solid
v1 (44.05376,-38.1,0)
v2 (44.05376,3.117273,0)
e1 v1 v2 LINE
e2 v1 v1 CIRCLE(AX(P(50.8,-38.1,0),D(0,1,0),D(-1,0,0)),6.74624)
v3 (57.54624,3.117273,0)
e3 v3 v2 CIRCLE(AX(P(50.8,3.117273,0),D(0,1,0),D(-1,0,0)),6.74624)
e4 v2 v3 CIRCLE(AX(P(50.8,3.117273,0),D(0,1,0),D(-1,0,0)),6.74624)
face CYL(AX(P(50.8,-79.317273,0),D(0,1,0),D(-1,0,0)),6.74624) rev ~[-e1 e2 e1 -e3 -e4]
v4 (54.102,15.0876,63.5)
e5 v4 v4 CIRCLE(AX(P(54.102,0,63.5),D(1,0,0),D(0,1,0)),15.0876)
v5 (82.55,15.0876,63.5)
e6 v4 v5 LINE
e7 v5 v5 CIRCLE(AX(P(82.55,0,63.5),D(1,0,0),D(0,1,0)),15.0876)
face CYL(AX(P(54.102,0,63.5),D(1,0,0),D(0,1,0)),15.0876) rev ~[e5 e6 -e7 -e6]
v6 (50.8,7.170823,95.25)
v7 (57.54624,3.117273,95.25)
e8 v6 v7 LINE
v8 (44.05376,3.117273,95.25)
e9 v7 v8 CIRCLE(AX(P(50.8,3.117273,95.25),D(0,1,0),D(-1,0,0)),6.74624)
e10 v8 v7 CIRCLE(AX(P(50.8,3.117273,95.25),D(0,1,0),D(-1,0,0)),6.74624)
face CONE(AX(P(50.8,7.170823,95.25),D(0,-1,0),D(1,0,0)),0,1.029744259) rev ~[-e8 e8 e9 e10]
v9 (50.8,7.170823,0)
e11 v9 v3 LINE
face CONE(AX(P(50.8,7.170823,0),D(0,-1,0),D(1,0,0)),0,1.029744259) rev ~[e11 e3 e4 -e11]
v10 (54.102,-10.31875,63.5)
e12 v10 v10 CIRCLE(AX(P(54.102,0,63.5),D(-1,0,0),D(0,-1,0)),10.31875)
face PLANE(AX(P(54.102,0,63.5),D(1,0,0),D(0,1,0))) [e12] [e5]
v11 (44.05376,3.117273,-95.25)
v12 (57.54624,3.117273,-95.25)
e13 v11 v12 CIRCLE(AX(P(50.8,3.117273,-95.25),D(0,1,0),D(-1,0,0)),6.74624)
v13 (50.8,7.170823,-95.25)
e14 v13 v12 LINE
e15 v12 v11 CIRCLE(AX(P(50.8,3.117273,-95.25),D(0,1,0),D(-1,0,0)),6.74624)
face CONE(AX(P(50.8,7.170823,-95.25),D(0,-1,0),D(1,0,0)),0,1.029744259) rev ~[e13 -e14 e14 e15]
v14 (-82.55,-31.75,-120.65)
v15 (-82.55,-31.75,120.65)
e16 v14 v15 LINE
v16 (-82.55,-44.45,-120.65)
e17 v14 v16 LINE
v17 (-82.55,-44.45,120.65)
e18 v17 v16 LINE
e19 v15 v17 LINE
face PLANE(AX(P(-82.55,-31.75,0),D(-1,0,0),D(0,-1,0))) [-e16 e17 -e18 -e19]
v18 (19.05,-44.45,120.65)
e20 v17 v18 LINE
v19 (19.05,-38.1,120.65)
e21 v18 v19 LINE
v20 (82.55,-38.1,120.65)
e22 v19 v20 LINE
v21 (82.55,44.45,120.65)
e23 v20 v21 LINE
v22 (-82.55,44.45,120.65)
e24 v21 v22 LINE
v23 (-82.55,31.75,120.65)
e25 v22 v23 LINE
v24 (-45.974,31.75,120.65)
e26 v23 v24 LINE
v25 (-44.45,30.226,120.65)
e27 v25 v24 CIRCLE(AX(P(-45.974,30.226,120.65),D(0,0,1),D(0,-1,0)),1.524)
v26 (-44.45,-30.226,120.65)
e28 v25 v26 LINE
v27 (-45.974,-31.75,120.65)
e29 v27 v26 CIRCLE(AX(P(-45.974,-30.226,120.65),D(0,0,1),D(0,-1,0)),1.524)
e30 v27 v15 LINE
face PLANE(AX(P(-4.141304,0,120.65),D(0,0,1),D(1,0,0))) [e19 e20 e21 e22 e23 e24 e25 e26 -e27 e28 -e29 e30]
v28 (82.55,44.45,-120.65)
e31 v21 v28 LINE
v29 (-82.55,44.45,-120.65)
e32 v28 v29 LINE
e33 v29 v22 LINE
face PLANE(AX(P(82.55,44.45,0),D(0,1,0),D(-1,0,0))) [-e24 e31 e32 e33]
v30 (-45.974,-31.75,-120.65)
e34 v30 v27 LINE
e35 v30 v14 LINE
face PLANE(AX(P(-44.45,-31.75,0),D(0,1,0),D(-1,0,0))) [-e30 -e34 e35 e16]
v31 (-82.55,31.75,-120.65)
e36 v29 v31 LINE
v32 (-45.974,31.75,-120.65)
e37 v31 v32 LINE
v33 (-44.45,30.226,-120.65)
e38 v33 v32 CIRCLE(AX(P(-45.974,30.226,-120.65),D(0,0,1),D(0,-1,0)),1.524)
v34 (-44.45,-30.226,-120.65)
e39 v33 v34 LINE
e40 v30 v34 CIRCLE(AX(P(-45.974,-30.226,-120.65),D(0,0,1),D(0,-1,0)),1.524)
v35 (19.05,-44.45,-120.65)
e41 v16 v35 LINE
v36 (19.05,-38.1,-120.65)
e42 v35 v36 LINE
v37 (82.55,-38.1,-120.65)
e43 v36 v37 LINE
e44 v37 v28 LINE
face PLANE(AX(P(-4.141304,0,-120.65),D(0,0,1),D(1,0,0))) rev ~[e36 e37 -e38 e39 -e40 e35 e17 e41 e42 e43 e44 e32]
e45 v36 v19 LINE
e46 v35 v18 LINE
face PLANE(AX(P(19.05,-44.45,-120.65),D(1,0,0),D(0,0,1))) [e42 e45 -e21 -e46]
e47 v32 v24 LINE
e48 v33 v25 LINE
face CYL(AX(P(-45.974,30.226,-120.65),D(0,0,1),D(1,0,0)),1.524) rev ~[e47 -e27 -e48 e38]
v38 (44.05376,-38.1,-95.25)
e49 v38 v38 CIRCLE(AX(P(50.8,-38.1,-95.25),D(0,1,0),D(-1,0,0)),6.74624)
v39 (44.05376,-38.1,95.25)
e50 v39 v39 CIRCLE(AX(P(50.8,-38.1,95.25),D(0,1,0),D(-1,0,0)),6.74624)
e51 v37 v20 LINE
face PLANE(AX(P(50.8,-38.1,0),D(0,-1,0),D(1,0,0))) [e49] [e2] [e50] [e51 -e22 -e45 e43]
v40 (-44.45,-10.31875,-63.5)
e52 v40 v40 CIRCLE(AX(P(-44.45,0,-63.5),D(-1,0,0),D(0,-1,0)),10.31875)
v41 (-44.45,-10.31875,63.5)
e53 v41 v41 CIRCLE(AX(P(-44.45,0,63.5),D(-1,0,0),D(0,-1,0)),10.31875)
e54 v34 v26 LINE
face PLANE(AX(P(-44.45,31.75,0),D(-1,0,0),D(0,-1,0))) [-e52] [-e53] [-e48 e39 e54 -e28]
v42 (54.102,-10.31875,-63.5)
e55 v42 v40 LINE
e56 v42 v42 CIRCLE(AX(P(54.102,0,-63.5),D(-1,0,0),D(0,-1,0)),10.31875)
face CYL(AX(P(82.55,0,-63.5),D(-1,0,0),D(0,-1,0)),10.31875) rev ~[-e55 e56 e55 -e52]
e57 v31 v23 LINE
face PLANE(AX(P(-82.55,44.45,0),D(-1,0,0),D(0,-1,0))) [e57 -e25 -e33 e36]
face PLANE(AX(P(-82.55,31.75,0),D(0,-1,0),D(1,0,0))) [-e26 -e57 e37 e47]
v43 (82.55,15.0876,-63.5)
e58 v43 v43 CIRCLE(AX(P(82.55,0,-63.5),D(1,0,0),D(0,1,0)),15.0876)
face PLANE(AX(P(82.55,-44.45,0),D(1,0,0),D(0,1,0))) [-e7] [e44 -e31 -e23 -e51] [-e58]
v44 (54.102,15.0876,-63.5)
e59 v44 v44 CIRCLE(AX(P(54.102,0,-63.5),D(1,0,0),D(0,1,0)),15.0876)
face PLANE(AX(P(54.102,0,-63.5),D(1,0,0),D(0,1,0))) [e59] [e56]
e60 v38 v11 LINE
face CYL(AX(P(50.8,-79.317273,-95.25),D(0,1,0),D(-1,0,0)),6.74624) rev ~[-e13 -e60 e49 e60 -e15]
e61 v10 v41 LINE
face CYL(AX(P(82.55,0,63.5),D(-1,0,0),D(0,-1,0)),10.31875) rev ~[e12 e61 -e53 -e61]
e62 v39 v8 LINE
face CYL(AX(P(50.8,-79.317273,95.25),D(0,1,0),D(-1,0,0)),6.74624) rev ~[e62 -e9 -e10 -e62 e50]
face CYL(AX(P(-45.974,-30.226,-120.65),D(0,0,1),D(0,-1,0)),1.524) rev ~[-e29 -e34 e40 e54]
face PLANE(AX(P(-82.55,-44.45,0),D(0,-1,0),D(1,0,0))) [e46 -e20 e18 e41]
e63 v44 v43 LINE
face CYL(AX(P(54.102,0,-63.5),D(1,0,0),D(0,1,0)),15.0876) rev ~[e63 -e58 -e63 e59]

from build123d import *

# Parameters (mm, degrees)
F1_DEPTH       = 120.65
F2_R           = 1.524
F4_D           = 20.6375
F4_CBORE_D     = 30.1752
F4_CBORE_DEPTH = 28.448
F5_W           = 63.5
F5_H           = 241.3
F6_DEPTH       = 6.35
F8_D           = 13.49248
F8_DEPTH       = 41.2172727273
F8_TIP         = 4.0535499425


# Not quite as in the source:
# - a length typed as a fraction of an inch, garbled in the dataset ("3 / 203.2 mm" for 3/8 in), is restored


with BuildPart() as f1:
    # F0 (on Top) → F1 (new body, symmetric)
    with BuildSketch(Plane.XY):
        Polygon((82.55, 44.45), (-82.55, 44.45), (-82.55, 31.75), (-44.45, 31.75), (-44.45, -31.75), (-82.55, -31.75), (-82.55, -44.45), (82.55, -44.45), align=None)
    extrude(amount=F1_DEPTH, both=True)

    # F2
    f2_edges = [f1.edges().sort_by_distance(p)[0] for p in [
        (-44.45, 31.75, 0),
        (-44.45, -31.75, 0),
    ]]
    fillet(f2_edges, radius=F2_R)

    # F4 (through all)
    with Locations(Plane.YZ.offset(82.55)):
        with Locations((0, 63.5), (0, -63.5)):
            CounterBoreHole(F4_D / 2, F4_CBORE_D / 2, F4_CBORE_DEPTH)

    # F5 (on face) → F6 (cut)
    with BuildSketch(Plane.XZ.offset(44.45)):
        with Locations((50.8, 0)):
            Rectangle(F5_W, F5_H)
    extrude(amount=-F6_DEPTH, mode=Mode.SUBTRACT)

    # F8
    with Locations(Plane.XZ.offset(38.1)):
        with Locations((50.8, 95.25), (50.8, 0), (50.8, -95.25)):
            Hole(F8_D / 2, depth=F8_DEPTH)
            with Locations((0, 0, -(F8_DEPTH + F8_TIP / 2))):  # 118° drill point
                Cone(0, F8_D / 2, F8_TIP, mode=Mode.SUBTRACT)


solid = f1.part
